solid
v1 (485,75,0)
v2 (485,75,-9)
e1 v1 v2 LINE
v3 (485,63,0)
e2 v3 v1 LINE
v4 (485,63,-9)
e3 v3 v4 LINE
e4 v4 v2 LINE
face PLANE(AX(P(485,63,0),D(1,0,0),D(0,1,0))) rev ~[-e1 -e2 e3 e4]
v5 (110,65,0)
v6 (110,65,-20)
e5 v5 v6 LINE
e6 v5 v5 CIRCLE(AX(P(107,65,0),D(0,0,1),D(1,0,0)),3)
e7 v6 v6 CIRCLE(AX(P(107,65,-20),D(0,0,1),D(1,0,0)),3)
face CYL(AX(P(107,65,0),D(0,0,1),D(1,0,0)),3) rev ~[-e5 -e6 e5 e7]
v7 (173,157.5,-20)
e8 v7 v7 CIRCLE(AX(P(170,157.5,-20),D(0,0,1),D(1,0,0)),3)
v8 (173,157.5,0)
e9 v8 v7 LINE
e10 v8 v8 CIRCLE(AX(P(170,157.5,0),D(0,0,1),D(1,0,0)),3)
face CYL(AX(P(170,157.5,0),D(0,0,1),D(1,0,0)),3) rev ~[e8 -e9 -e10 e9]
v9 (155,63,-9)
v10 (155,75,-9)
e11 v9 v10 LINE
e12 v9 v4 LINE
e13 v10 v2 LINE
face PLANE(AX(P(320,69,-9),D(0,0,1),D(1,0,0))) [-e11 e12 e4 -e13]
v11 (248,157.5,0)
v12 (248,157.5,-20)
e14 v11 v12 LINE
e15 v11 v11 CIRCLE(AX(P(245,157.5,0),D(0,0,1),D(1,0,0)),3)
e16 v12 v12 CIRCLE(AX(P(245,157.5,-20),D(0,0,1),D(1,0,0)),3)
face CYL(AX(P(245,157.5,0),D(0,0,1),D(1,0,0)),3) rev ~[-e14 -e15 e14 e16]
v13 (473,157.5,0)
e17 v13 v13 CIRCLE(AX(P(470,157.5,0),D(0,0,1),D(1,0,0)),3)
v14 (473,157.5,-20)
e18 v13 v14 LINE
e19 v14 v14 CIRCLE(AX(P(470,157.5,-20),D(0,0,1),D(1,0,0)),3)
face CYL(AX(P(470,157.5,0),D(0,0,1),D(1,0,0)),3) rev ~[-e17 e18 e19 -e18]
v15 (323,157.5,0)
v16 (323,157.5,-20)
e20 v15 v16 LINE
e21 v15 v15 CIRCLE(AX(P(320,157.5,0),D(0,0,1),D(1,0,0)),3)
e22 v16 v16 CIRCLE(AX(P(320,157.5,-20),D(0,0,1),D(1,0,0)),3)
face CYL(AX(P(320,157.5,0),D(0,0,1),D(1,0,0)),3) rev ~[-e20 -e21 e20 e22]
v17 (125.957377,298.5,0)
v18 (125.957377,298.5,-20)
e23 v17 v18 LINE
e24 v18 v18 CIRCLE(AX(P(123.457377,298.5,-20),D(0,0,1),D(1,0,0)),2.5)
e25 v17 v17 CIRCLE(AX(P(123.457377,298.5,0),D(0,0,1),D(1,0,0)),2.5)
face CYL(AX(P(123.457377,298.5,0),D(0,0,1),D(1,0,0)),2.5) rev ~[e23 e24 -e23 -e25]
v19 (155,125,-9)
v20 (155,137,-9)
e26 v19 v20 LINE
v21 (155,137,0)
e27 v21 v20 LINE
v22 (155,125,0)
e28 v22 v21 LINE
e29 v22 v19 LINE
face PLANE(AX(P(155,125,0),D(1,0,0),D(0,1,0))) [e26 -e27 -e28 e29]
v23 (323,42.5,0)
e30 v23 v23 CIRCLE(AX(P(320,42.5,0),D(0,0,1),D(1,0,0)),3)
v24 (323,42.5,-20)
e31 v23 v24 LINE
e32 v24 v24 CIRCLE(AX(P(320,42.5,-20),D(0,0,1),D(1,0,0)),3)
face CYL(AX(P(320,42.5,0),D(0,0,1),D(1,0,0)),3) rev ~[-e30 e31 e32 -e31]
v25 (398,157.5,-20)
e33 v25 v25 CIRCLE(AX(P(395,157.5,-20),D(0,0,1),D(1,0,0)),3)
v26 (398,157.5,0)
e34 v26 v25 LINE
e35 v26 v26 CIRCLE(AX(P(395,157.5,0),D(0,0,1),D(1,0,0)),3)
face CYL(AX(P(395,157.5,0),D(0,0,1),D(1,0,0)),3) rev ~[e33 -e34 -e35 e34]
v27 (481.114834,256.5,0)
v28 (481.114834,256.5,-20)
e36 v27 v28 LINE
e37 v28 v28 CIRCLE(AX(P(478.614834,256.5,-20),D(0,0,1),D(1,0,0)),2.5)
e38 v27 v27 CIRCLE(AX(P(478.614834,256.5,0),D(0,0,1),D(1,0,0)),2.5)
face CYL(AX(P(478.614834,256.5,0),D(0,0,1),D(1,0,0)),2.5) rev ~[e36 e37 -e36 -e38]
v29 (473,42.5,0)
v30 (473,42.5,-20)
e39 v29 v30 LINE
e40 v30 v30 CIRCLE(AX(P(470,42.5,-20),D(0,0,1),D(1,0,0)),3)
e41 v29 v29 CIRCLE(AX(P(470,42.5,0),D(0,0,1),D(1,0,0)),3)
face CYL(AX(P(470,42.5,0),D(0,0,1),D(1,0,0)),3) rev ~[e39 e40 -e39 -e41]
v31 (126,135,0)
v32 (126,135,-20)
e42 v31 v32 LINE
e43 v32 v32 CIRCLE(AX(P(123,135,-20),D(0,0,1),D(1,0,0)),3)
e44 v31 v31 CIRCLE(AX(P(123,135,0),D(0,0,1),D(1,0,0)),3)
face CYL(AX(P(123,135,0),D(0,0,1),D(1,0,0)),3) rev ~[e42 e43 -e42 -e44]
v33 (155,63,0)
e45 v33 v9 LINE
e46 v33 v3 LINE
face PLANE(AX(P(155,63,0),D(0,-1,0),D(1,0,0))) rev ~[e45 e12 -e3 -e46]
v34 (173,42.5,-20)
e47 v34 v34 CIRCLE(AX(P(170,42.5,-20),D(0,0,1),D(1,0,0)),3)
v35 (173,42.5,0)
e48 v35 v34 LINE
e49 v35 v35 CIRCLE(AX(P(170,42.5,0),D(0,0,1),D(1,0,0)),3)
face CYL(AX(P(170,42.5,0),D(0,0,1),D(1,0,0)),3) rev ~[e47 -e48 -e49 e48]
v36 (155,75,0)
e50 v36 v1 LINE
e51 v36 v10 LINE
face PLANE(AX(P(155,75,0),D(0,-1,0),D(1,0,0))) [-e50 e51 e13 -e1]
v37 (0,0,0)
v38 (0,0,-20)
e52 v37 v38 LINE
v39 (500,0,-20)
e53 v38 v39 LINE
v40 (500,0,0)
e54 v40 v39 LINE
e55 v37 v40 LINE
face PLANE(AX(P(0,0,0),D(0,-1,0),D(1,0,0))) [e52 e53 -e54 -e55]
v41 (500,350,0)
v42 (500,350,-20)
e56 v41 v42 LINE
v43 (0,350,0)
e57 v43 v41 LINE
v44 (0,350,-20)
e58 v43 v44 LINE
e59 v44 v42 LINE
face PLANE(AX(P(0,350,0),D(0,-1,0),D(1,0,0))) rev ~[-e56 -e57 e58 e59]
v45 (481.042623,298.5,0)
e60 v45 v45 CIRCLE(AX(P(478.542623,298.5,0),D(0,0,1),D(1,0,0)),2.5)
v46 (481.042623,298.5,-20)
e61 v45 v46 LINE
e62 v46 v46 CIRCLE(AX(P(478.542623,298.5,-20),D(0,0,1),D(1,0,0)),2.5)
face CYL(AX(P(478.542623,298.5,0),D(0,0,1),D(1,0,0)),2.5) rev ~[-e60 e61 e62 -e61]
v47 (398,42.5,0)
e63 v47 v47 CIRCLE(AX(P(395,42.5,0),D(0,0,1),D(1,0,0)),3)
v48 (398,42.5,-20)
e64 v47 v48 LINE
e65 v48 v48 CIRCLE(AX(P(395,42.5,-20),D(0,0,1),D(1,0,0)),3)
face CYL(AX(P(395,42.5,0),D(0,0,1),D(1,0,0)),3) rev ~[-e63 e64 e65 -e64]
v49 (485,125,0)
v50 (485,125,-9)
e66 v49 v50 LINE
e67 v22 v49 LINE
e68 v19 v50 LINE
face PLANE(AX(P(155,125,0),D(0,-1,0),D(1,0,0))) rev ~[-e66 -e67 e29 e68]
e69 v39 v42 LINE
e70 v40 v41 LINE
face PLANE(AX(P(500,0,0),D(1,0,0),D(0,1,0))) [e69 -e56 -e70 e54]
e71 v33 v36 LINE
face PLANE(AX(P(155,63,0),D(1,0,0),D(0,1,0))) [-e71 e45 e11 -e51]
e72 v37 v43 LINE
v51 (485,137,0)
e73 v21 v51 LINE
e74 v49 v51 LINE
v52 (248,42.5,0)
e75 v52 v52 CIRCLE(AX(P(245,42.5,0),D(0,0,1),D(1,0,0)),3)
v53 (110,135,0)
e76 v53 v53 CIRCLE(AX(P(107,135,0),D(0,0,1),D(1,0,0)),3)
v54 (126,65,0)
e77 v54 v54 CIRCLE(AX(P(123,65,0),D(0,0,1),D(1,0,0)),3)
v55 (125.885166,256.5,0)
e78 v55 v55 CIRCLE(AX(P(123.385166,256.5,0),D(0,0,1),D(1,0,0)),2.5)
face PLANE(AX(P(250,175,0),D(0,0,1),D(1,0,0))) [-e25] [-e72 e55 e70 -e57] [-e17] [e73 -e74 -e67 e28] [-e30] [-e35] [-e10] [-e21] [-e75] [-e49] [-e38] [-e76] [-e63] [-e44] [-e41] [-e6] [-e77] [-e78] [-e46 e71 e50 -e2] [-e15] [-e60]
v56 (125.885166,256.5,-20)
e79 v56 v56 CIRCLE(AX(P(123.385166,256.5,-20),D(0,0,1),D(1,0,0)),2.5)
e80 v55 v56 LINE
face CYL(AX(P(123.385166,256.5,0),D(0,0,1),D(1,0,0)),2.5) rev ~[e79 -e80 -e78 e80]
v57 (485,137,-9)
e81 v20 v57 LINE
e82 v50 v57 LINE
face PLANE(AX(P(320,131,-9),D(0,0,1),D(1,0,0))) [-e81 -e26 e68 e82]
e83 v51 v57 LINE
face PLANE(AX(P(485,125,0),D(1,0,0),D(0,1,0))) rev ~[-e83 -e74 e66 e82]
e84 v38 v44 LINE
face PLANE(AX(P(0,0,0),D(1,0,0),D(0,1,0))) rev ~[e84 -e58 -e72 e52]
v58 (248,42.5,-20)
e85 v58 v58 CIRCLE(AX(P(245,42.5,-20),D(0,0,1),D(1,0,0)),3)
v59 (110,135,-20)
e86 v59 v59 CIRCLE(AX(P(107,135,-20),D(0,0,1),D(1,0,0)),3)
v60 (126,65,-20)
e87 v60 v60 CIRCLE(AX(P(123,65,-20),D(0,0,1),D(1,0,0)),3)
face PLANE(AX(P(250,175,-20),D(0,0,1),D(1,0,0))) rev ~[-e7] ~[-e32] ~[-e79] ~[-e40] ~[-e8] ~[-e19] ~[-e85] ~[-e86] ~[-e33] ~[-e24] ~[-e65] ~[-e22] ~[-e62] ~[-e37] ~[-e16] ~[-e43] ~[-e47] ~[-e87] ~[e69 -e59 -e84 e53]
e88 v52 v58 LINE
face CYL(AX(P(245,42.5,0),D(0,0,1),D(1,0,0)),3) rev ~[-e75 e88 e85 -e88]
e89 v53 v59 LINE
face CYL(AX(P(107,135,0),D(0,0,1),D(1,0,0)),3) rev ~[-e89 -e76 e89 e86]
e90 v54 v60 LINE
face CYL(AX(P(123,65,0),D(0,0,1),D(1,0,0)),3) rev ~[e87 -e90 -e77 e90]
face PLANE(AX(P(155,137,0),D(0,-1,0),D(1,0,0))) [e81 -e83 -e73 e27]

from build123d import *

# Parameters (mm, degrees)
F0_W     = 500
F0_H     = 350
F0_R     = 3
F0_R_2   = 2.5
F0_W_2   = 330
F0_H_2   = 12
F1_DEPTH = 20
F2_DEPTH = 9
F3_DEPTH = 20


# Not quite as in the source:
# - a feature names something its author has since deleted; it is built from what else it names


with BuildPart() as f1:
    # F0 (on Top) → F1 (new body)
    with BuildSketch(Plane.XY):
        with Locations((250, 175)):
            Rectangle(F0_W, F0_H)
        with Locations((107, 65)):
            Circle(F0_R, mode=Mode.SUBTRACT)
        with Locations((123, 65)):
            Circle(F0_R, mode=Mode.SUBTRACT)
        with Locations((107, 135)):
            Circle(F0_R, mode=Mode.SUBTRACT)
        with Locations((123, 135)):
            Circle(F0_R, mode=Mode.SUBTRACT)
        with Locations((170, 42.5)):
            Circle(F0_R, mode=Mode.SUBTRACT)
        with Locations((245, 42.5)):
            Circle(F0_R, mode=Mode.SUBTRACT)
        with Locations((123.3851659298, 256.5)):
            Circle(F0_R_2, mode=Mode.SUBTRACT)
        with Locations((123.4573769569, 298.5)):
            Circle(F0_R_2, mode=Mode.SUBTRACT)
        with Locations((170, 157.5)):
            Circle(F0_R, mode=Mode.SUBTRACT)
        with Locations((245, 157.5)):
            Circle(F0_R, mode=Mode.SUBTRACT)
        with Locations((320, 42.5)):
            Circle(F0_R, mode=Mode.SUBTRACT)
        with Locations((320, 69)):
            Rectangle(F0_W_2, F0_H_2, mode=Mode.SUBTRACT)
        with Locations((320, 131)):
            Rectangle(F0_W_2, F0_H_2, mode=Mode.SUBTRACT)
        with Locations((395, 42.5)):
            Circle(F0_R, mode=Mode.SUBTRACT)
        with Locations((470, 42.5)):
            Circle(F0_R, mode=Mode.SUBTRACT)
        with Locations((320, 157.5)):
            Circle(F0_R, mode=Mode.SUBTRACT)
        with Locations((395, 157.5)):
            Circle(F0_R, mode=Mode.SUBTRACT)
        with Locations((470, 157.5)):
            Circle(F0_R, mode=Mode.SUBTRACT)
        with Locations((478.6148340702, 256.5)):
            Circle(F0_R_2, mode=Mode.SUBTRACT)
        with Locations((478.5426230431, 298.5)):
            Circle(F0_R_2, mode=Mode.SUBTRACT)
        with Locations((320, 131)):
            Rectangle(F0_W_2, F0_H_2)
        with Locations((245, 157.5)):
            Circle(F0_R)
        with Locations((395, 157.5)):
            Circle(F0_R)
        with Locations((470, 42.5)):
            Circle(F0_R)
        with Locations((395, 42.5)):
            Circle(F0_R)
        with Locations((320, 42.5)):
            Circle(F0_R)
        with Locations((170, 42.5)):
            Circle(F0_R)
        with Locations((245, 42.5)):
            Circle(F0_R)
        with Locations((123, 65)):
            Circle(F0_R)
        with Locations((107, 65)):
            Circle(F0_R)
        with Locations((123, 135)):
            Circle(F0_R)
        with Locations((170, 157.5)):
            Circle(F0_R)
        with Locations((320, 157.5)):
            Circle(F0_R)
        with Locations((470, 157.5)):
            Circle(F0_R)
        with Locations((107, 135)):
            Circle(F0_R)
        with Locations((478.5426230431, 298.5)):
            Circle(F0_R_2)
        with Locations((478.6148340702, 256.5)):
            Circle(F0_R_2)
        with Locations((123.4573769569, 298.5)):
            Circle(F0_R_2)
        with Locations((123.3851659298, 256.5)):
            Circle(F0_R_2)
        with Locations((320, 69)):
            Rectangle(F0_W_2, F0_H_2)
    extrude(amount=-F1_DEPTH)

    # F0 (on Top) → F2 (cut)
    with BuildSketch(Plane.XY):
        with Locations((320, 131)):
            Rectangle(F0_W_2, F0_H_2)
        with Locations((320, 69)):
            Rectangle(F0_W_2, F0_H_2)
    extrude(amount=-F2_DEPTH, mode=Mode.SUBTRACT)

    # F0 (on Top) → F3 (cut)
    with BuildSketch(Plane.XY):
        with Locations((170, 42.5)):
            Circle(F0_R)
        with Locations((245, 42.5)):
            Circle(F0_R)
        with Locations((320, 42.5)):
            Circle(F0_R)
        with Locations((395, 42.5)):
            Circle(F0_R)
        with Locations((470, 42.5)):
            Circle(F0_R)
        with Locations((470, 157.5)):
            Circle(F0_R)
        with Locations((395, 157.5)):
            Circle(F0_R)
        with Locations((320, 157.5)):
            Circle(F0_R)
        with Locations((245, 157.5)):
            Circle(F0_R)
        with Locations((170, 157.5)):
            Circle(F0_R)
        with Locations((107, 135)):
            Circle(F0_R)
        with Locations((123, 135)):
            Circle(F0_R)
        with Locations((123, 65)):
            Circle(F0_R)
        with Locations((107, 65)):
            Circle(F0_R)
        with Locations((478.5426230431, 298.5)):
            Circle(F0_R_2)
        with Locations((478.6148340702, 256.5)):
            Circle(F0_R_2)
        with Locations((123.3851659298, 256.5)):
            Circle(F0_R_2)
        with Locations((123.4573769569, 298.5)):
            Circle(F0_R_2)
    extrude(amount=-F3_DEPTH, mode=Mode.SUBTRACT)


solid = f1.part
